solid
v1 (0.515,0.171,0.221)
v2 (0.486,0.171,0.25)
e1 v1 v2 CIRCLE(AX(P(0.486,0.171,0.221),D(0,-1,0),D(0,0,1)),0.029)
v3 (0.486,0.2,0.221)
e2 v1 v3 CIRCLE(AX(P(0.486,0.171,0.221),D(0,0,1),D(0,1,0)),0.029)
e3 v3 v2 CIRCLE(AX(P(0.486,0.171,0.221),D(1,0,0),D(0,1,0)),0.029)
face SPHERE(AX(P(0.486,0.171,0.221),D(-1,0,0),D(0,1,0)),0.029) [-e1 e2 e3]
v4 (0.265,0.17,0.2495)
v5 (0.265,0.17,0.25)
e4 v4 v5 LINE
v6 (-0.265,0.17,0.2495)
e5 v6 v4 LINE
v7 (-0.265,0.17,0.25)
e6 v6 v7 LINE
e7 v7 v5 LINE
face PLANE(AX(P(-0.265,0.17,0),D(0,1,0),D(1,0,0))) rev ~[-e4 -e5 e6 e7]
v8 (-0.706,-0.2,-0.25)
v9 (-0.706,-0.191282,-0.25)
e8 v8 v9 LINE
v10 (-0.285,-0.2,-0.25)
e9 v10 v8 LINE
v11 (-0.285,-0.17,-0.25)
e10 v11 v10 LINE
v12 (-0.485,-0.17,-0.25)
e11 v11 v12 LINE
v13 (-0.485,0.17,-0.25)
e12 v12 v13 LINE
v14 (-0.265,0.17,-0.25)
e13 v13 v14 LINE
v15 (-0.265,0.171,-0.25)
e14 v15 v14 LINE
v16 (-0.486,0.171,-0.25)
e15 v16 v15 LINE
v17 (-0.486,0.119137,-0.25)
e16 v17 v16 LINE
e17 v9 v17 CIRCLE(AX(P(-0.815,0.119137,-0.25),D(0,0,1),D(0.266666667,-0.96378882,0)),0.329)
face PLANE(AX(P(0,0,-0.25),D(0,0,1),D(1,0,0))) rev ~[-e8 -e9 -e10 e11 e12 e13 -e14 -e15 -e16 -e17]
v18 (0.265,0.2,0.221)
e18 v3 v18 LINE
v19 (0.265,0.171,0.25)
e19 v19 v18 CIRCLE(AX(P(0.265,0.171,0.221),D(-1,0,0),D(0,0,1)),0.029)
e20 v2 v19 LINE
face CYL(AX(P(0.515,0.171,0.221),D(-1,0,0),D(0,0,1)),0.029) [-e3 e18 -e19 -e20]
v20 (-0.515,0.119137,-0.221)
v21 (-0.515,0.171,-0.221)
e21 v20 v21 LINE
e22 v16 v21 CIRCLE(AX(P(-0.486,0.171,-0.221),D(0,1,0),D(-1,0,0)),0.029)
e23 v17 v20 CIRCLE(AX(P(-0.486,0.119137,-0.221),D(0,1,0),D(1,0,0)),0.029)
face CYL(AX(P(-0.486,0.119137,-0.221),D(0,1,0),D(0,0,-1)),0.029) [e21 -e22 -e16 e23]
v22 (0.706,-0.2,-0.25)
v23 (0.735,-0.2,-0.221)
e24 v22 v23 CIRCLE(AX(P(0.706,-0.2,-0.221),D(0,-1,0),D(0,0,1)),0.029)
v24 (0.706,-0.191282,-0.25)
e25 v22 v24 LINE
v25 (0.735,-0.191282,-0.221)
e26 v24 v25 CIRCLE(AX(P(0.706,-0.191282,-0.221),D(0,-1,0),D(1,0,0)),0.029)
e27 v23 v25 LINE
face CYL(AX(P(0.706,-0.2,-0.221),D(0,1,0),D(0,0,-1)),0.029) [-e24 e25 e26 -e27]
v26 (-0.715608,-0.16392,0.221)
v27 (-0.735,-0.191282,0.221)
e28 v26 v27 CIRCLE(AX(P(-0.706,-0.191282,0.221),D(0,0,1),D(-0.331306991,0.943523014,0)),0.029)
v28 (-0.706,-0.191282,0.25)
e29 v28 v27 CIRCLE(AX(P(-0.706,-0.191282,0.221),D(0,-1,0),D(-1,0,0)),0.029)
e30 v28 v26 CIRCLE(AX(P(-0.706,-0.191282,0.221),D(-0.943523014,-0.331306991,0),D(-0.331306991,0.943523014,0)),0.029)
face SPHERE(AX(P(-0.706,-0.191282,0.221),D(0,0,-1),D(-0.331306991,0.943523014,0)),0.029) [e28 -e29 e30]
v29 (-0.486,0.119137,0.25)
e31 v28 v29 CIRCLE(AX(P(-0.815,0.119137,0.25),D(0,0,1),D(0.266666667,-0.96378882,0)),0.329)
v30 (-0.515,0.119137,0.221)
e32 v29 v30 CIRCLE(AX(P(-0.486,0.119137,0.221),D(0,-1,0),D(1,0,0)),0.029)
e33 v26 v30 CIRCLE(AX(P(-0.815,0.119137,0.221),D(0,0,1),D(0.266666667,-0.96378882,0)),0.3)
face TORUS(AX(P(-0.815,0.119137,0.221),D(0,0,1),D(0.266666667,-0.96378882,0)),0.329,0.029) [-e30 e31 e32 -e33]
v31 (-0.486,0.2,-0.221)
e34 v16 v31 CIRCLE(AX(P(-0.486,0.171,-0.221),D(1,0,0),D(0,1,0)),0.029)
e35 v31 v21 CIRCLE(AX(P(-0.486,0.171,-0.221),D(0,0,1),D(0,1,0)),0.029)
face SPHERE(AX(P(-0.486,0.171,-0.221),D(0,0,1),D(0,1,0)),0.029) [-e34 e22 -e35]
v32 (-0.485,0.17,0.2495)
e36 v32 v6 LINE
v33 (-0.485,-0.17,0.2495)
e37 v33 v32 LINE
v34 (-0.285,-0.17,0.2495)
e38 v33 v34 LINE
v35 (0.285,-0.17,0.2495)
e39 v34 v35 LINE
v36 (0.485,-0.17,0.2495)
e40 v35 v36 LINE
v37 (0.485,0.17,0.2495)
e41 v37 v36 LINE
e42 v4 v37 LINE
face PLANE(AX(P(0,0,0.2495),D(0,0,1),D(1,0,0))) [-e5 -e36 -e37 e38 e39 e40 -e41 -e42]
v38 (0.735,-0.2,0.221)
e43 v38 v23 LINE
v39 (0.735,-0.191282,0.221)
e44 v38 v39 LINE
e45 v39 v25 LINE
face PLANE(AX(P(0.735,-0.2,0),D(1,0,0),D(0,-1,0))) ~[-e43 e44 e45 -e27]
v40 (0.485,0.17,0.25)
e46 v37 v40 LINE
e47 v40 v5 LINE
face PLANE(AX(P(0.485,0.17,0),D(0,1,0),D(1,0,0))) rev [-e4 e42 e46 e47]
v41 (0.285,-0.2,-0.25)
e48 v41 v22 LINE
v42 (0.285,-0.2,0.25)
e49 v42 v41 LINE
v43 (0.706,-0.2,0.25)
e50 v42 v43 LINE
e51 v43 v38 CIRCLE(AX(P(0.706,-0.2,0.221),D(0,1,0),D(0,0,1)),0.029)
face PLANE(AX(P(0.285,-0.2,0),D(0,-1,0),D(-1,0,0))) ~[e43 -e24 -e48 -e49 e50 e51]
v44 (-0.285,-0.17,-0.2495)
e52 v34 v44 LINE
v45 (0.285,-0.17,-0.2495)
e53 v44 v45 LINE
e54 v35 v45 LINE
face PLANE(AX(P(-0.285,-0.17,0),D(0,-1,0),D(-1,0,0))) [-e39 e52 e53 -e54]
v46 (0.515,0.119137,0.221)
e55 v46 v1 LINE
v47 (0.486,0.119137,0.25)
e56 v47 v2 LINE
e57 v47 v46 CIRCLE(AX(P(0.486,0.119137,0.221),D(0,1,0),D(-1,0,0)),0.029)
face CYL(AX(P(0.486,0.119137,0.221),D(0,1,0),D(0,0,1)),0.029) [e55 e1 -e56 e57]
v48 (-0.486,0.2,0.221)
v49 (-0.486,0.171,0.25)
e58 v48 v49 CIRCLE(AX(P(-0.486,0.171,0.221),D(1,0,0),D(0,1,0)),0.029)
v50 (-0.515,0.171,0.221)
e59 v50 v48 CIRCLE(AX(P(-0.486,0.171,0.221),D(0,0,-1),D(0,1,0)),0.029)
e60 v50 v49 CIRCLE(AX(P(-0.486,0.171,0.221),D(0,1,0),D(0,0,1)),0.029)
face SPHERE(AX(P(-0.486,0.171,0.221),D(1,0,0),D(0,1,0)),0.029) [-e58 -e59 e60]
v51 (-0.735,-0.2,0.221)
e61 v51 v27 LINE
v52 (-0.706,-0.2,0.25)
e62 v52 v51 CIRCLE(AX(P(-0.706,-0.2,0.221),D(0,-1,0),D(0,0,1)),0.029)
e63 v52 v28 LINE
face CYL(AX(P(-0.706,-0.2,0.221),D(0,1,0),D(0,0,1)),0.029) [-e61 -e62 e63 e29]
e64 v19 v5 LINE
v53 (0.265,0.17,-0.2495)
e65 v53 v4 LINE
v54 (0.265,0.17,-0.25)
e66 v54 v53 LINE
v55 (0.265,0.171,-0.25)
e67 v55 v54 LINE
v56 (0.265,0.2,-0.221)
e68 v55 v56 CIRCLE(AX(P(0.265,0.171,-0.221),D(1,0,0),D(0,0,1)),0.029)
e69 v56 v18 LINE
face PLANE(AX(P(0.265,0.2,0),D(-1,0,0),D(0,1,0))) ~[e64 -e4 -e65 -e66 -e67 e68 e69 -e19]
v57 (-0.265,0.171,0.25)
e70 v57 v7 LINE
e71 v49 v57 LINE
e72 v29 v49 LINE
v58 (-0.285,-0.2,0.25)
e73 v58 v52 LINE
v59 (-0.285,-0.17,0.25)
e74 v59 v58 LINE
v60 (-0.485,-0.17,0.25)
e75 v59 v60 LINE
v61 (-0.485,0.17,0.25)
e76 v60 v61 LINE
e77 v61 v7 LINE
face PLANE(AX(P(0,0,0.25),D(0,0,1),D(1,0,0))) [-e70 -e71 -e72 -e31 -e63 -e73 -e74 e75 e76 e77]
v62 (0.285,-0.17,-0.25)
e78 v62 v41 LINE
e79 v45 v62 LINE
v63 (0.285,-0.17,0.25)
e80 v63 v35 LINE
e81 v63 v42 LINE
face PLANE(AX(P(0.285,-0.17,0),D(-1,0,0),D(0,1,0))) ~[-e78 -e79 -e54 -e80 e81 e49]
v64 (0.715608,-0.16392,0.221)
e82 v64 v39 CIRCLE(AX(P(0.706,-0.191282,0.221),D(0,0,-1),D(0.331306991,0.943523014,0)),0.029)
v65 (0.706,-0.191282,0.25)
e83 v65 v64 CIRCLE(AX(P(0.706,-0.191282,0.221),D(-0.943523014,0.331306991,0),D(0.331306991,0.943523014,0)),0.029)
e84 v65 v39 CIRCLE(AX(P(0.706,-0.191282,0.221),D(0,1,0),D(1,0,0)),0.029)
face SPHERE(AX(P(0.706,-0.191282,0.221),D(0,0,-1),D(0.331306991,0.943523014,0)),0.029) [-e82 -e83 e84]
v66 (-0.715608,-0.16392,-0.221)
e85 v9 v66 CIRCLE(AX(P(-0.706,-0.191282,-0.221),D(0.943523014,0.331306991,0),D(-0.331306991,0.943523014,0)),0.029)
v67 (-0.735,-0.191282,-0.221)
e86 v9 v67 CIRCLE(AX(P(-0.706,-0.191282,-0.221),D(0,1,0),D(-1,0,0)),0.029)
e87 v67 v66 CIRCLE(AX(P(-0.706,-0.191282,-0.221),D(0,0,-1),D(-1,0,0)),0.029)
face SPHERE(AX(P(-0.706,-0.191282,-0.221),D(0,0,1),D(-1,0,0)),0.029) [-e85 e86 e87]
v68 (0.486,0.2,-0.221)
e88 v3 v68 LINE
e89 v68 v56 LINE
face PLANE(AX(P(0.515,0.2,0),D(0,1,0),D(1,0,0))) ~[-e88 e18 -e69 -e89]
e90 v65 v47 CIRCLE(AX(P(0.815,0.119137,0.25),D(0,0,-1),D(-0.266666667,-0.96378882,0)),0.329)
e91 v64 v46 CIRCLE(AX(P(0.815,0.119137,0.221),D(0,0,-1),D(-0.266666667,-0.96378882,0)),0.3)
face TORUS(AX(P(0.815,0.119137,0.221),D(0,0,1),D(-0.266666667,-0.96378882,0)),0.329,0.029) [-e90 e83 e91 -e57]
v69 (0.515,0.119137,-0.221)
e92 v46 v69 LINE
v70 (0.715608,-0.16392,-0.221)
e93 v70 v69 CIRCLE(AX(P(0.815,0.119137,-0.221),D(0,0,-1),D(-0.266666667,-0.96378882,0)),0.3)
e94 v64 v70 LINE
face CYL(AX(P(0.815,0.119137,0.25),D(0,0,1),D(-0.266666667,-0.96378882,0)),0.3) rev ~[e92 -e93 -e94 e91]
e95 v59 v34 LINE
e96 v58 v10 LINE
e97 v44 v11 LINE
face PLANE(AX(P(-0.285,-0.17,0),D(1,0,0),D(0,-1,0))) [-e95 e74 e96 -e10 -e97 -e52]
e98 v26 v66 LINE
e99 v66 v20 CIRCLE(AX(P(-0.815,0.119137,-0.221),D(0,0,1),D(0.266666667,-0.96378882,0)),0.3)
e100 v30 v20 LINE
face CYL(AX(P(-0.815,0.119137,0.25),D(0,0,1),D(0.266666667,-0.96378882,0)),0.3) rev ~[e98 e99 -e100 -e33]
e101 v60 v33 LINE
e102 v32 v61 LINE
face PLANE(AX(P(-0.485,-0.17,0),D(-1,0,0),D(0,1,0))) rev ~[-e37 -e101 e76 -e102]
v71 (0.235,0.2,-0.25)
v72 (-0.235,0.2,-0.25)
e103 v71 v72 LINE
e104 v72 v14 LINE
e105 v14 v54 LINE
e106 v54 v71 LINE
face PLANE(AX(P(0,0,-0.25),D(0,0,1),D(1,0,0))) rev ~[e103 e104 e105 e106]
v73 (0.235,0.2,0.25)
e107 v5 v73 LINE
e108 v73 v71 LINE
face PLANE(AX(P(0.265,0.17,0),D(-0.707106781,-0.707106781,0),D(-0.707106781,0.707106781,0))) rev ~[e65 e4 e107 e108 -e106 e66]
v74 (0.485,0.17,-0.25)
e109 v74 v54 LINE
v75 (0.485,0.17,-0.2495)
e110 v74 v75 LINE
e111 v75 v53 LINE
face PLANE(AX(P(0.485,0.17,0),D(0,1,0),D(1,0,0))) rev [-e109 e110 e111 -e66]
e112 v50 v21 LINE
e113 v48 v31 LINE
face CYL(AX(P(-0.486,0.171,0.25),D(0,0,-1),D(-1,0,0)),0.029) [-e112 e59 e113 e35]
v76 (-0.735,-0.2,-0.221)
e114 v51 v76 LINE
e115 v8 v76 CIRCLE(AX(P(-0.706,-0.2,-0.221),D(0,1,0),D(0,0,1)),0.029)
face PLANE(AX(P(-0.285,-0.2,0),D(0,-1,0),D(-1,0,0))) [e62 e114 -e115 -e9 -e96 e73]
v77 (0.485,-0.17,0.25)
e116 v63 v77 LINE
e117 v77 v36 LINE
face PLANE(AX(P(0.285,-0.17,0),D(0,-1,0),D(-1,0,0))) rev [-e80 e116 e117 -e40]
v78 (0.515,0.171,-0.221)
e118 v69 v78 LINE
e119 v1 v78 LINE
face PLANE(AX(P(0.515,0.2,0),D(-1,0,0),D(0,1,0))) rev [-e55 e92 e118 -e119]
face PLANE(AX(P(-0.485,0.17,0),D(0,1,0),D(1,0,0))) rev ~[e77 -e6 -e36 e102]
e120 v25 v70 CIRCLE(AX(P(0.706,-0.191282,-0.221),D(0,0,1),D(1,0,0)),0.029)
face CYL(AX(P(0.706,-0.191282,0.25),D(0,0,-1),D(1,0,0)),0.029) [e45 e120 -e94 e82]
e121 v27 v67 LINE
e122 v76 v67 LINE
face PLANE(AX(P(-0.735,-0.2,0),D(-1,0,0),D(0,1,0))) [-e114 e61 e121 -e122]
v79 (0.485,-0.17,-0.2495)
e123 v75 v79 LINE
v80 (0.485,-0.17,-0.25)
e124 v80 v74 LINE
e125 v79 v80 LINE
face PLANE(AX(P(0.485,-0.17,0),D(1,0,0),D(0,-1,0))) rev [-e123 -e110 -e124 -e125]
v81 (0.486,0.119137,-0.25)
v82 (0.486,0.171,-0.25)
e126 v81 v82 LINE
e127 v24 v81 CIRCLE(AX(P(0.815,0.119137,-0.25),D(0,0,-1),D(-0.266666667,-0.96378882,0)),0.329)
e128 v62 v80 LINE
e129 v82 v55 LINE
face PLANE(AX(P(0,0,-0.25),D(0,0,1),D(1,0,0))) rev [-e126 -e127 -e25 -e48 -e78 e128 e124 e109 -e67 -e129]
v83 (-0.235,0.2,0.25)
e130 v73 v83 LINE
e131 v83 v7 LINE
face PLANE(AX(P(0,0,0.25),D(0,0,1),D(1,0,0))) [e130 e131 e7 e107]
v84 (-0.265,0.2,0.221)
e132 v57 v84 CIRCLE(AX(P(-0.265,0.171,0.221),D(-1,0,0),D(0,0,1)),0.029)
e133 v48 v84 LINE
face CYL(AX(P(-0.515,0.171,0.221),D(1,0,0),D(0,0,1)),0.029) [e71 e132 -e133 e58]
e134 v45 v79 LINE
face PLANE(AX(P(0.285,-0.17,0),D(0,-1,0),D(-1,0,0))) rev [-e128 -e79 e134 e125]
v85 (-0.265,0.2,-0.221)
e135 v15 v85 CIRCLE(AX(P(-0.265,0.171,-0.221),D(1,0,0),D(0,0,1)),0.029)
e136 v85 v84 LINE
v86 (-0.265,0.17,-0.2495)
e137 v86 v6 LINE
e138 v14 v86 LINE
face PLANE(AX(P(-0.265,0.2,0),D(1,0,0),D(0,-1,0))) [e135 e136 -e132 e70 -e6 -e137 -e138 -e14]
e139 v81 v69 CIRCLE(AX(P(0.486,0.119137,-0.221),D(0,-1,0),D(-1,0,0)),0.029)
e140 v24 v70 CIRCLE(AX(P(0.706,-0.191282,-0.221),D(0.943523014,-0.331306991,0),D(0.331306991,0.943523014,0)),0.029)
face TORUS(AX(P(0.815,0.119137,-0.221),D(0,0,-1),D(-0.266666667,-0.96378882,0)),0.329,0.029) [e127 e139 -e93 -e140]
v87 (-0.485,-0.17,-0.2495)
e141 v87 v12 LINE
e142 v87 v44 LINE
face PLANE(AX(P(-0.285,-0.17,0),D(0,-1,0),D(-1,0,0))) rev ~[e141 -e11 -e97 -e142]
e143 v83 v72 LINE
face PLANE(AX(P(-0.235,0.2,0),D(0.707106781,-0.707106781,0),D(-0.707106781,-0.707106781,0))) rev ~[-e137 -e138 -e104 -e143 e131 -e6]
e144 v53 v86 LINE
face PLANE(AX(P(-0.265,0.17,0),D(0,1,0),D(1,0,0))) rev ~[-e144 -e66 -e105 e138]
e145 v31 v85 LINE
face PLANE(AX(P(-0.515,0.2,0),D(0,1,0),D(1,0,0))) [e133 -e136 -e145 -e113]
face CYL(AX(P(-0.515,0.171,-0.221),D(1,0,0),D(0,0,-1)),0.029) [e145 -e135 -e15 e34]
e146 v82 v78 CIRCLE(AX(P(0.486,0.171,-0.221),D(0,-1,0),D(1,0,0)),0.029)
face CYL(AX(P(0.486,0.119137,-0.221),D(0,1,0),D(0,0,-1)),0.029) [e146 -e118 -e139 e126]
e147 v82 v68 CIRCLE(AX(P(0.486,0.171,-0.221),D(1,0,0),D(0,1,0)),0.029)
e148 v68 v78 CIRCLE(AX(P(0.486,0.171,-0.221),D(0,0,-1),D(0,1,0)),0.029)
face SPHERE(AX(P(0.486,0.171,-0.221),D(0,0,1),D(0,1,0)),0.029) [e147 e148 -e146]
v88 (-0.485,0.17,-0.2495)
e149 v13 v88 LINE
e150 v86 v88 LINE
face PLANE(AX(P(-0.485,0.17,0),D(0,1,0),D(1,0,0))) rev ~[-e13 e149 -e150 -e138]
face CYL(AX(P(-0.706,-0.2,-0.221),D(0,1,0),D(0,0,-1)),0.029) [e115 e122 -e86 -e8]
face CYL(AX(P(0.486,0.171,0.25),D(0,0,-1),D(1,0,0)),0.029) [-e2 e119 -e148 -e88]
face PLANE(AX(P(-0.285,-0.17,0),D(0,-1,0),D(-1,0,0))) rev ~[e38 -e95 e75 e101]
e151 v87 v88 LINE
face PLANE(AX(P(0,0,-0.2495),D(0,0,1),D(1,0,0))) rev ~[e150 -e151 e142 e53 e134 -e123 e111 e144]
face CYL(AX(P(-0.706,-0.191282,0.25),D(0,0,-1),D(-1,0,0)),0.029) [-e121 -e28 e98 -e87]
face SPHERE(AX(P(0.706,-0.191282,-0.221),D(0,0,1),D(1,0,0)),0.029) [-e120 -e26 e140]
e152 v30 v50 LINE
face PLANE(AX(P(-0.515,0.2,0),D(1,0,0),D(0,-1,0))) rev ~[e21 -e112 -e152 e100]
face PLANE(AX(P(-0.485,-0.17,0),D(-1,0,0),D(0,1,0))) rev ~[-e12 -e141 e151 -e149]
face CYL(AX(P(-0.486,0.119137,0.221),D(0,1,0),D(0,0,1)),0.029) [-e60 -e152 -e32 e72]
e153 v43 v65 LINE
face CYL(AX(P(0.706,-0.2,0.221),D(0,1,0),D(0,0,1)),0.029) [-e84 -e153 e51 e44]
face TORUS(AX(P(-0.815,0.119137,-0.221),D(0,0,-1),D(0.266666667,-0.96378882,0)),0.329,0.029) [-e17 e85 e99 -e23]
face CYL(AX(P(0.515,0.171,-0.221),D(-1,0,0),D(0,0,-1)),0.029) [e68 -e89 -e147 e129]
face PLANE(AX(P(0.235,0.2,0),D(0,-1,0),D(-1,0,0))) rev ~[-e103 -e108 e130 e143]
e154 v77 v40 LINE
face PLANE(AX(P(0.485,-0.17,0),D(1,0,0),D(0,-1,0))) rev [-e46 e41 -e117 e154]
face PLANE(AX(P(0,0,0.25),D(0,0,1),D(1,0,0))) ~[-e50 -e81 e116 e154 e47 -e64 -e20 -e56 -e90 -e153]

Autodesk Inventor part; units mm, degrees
ref_plane "YZ Plane" through (0, 0, 0) normal (1, 0, 0) x (0, 1, 0)
ref_plane "XZ Plane" through (0, 0, 0) normal (0, 1, 0) x (-1, 0, 0)
ref_plane "XY Plane" through (0, 0, 0) normal (0, 0, 1) x (1, 0, 0)
sketch "Sketch10" plane through (0, 0, 0) normal (0, 0, 1) x (1, 0, 0)
  line L0 (-0.485, 0.17) -> (0.485, 0.17)
  line L1 (0.485, 0.17) -> (0.485, -0.17)
  line L2 (0.485, -0.17) -> (-0.485, -0.17)
  line L3 (-0.485, -0.17) -> (-0.485, 0.17)
  line L4 (-0.265, 0.17) -> (-0.485, 0.17)
  line L5 (-0.515, 0.2) -> (-0.265, 0.2)
  line L6 (-0.265, 0.2) -> (-0.265, 0.17)
  line L7 (-0.515, 0.2) -> (-0.515, -0.17)
  line L8 (-0.485, -0.17) -> (-0.485, 0.17)
  line L9 (-0.285, -0.17) -> (-0.285, -0.2)
  line L10 (-0.285, -0.2) -> (-0.735, -0.2)
  line L11 (-0.735, -0.2) -> (-0.735, -0.17)
  line L12 (-0.735, -0.17) -> (-0.515, -0.17)
  line L13 (-0.485, -0.17) -> (-0.285, -0.17)
  line L14 (-0.265, 0.17) -> (0.265, 0.17)
  line L15 (0.265, 0.17) -> (0.235, 0.2)
  line L16 (0.235, 0.2) -> (-0.235, 0.2)
  line L17 (-0.235, 0.2) -> (-0.265, 0.17)
  point P0 (0, 0)
  point P1 (0, 0.17)
  point P2 (-0.485, 0)
  point P3 (0, 0.2)
  dimension "d11" = 0.2
  dimension "d12" = 0.45
  dimension "d13" = 0.03
  dimension "d14" = 0.03
  dimension "d15" = 0.25
  dimension "d16" = 45
  dimension "d19" = 0.03
  dimension "d21" = 1
  dimension "d22" = 0.4
extrude "Extrusion4" add sketch "Sketch10" along normal mid plane 0.499 contours L0 L1 L2 L3
extrude "Extrusion5" add sketch "Sketch10" along normal mid plane 0.5 contours L3 L2 L9 L10 L11 L12 L7 L5 L6 L0 | L17 L16 L15 L0
fillet "Fillet2" radius 0.3 1 edges at (-0.515, -0.17, 0)
fillet "Fillet3" radius 0.029 10 edges at (-0.39, 0.2, 0.25) (-0.515, 0.2, 0) (-0.39, 0.2, -0.25) (-0.5763, -0.0625, -0.25) (-0.515, 0.1596, -0.25) (-0.5763, -0.0625, 0.25) (-0.515, 0.1596, 0.25) (-0.735, -0.185, 0.25) (-0.735, -0.17, 0) (-0.735, -0.185, -0.25)
mirror "Mirror1" about plane through (0, 0, 0) normal (1, 0, 0) of "Extrusion5", "Fillet2", "Fillet3"
equation "\"d14\" = d13"
equation "\"d19\" = d13"
properties part number "RC0402FR-07100KL Resistor"
